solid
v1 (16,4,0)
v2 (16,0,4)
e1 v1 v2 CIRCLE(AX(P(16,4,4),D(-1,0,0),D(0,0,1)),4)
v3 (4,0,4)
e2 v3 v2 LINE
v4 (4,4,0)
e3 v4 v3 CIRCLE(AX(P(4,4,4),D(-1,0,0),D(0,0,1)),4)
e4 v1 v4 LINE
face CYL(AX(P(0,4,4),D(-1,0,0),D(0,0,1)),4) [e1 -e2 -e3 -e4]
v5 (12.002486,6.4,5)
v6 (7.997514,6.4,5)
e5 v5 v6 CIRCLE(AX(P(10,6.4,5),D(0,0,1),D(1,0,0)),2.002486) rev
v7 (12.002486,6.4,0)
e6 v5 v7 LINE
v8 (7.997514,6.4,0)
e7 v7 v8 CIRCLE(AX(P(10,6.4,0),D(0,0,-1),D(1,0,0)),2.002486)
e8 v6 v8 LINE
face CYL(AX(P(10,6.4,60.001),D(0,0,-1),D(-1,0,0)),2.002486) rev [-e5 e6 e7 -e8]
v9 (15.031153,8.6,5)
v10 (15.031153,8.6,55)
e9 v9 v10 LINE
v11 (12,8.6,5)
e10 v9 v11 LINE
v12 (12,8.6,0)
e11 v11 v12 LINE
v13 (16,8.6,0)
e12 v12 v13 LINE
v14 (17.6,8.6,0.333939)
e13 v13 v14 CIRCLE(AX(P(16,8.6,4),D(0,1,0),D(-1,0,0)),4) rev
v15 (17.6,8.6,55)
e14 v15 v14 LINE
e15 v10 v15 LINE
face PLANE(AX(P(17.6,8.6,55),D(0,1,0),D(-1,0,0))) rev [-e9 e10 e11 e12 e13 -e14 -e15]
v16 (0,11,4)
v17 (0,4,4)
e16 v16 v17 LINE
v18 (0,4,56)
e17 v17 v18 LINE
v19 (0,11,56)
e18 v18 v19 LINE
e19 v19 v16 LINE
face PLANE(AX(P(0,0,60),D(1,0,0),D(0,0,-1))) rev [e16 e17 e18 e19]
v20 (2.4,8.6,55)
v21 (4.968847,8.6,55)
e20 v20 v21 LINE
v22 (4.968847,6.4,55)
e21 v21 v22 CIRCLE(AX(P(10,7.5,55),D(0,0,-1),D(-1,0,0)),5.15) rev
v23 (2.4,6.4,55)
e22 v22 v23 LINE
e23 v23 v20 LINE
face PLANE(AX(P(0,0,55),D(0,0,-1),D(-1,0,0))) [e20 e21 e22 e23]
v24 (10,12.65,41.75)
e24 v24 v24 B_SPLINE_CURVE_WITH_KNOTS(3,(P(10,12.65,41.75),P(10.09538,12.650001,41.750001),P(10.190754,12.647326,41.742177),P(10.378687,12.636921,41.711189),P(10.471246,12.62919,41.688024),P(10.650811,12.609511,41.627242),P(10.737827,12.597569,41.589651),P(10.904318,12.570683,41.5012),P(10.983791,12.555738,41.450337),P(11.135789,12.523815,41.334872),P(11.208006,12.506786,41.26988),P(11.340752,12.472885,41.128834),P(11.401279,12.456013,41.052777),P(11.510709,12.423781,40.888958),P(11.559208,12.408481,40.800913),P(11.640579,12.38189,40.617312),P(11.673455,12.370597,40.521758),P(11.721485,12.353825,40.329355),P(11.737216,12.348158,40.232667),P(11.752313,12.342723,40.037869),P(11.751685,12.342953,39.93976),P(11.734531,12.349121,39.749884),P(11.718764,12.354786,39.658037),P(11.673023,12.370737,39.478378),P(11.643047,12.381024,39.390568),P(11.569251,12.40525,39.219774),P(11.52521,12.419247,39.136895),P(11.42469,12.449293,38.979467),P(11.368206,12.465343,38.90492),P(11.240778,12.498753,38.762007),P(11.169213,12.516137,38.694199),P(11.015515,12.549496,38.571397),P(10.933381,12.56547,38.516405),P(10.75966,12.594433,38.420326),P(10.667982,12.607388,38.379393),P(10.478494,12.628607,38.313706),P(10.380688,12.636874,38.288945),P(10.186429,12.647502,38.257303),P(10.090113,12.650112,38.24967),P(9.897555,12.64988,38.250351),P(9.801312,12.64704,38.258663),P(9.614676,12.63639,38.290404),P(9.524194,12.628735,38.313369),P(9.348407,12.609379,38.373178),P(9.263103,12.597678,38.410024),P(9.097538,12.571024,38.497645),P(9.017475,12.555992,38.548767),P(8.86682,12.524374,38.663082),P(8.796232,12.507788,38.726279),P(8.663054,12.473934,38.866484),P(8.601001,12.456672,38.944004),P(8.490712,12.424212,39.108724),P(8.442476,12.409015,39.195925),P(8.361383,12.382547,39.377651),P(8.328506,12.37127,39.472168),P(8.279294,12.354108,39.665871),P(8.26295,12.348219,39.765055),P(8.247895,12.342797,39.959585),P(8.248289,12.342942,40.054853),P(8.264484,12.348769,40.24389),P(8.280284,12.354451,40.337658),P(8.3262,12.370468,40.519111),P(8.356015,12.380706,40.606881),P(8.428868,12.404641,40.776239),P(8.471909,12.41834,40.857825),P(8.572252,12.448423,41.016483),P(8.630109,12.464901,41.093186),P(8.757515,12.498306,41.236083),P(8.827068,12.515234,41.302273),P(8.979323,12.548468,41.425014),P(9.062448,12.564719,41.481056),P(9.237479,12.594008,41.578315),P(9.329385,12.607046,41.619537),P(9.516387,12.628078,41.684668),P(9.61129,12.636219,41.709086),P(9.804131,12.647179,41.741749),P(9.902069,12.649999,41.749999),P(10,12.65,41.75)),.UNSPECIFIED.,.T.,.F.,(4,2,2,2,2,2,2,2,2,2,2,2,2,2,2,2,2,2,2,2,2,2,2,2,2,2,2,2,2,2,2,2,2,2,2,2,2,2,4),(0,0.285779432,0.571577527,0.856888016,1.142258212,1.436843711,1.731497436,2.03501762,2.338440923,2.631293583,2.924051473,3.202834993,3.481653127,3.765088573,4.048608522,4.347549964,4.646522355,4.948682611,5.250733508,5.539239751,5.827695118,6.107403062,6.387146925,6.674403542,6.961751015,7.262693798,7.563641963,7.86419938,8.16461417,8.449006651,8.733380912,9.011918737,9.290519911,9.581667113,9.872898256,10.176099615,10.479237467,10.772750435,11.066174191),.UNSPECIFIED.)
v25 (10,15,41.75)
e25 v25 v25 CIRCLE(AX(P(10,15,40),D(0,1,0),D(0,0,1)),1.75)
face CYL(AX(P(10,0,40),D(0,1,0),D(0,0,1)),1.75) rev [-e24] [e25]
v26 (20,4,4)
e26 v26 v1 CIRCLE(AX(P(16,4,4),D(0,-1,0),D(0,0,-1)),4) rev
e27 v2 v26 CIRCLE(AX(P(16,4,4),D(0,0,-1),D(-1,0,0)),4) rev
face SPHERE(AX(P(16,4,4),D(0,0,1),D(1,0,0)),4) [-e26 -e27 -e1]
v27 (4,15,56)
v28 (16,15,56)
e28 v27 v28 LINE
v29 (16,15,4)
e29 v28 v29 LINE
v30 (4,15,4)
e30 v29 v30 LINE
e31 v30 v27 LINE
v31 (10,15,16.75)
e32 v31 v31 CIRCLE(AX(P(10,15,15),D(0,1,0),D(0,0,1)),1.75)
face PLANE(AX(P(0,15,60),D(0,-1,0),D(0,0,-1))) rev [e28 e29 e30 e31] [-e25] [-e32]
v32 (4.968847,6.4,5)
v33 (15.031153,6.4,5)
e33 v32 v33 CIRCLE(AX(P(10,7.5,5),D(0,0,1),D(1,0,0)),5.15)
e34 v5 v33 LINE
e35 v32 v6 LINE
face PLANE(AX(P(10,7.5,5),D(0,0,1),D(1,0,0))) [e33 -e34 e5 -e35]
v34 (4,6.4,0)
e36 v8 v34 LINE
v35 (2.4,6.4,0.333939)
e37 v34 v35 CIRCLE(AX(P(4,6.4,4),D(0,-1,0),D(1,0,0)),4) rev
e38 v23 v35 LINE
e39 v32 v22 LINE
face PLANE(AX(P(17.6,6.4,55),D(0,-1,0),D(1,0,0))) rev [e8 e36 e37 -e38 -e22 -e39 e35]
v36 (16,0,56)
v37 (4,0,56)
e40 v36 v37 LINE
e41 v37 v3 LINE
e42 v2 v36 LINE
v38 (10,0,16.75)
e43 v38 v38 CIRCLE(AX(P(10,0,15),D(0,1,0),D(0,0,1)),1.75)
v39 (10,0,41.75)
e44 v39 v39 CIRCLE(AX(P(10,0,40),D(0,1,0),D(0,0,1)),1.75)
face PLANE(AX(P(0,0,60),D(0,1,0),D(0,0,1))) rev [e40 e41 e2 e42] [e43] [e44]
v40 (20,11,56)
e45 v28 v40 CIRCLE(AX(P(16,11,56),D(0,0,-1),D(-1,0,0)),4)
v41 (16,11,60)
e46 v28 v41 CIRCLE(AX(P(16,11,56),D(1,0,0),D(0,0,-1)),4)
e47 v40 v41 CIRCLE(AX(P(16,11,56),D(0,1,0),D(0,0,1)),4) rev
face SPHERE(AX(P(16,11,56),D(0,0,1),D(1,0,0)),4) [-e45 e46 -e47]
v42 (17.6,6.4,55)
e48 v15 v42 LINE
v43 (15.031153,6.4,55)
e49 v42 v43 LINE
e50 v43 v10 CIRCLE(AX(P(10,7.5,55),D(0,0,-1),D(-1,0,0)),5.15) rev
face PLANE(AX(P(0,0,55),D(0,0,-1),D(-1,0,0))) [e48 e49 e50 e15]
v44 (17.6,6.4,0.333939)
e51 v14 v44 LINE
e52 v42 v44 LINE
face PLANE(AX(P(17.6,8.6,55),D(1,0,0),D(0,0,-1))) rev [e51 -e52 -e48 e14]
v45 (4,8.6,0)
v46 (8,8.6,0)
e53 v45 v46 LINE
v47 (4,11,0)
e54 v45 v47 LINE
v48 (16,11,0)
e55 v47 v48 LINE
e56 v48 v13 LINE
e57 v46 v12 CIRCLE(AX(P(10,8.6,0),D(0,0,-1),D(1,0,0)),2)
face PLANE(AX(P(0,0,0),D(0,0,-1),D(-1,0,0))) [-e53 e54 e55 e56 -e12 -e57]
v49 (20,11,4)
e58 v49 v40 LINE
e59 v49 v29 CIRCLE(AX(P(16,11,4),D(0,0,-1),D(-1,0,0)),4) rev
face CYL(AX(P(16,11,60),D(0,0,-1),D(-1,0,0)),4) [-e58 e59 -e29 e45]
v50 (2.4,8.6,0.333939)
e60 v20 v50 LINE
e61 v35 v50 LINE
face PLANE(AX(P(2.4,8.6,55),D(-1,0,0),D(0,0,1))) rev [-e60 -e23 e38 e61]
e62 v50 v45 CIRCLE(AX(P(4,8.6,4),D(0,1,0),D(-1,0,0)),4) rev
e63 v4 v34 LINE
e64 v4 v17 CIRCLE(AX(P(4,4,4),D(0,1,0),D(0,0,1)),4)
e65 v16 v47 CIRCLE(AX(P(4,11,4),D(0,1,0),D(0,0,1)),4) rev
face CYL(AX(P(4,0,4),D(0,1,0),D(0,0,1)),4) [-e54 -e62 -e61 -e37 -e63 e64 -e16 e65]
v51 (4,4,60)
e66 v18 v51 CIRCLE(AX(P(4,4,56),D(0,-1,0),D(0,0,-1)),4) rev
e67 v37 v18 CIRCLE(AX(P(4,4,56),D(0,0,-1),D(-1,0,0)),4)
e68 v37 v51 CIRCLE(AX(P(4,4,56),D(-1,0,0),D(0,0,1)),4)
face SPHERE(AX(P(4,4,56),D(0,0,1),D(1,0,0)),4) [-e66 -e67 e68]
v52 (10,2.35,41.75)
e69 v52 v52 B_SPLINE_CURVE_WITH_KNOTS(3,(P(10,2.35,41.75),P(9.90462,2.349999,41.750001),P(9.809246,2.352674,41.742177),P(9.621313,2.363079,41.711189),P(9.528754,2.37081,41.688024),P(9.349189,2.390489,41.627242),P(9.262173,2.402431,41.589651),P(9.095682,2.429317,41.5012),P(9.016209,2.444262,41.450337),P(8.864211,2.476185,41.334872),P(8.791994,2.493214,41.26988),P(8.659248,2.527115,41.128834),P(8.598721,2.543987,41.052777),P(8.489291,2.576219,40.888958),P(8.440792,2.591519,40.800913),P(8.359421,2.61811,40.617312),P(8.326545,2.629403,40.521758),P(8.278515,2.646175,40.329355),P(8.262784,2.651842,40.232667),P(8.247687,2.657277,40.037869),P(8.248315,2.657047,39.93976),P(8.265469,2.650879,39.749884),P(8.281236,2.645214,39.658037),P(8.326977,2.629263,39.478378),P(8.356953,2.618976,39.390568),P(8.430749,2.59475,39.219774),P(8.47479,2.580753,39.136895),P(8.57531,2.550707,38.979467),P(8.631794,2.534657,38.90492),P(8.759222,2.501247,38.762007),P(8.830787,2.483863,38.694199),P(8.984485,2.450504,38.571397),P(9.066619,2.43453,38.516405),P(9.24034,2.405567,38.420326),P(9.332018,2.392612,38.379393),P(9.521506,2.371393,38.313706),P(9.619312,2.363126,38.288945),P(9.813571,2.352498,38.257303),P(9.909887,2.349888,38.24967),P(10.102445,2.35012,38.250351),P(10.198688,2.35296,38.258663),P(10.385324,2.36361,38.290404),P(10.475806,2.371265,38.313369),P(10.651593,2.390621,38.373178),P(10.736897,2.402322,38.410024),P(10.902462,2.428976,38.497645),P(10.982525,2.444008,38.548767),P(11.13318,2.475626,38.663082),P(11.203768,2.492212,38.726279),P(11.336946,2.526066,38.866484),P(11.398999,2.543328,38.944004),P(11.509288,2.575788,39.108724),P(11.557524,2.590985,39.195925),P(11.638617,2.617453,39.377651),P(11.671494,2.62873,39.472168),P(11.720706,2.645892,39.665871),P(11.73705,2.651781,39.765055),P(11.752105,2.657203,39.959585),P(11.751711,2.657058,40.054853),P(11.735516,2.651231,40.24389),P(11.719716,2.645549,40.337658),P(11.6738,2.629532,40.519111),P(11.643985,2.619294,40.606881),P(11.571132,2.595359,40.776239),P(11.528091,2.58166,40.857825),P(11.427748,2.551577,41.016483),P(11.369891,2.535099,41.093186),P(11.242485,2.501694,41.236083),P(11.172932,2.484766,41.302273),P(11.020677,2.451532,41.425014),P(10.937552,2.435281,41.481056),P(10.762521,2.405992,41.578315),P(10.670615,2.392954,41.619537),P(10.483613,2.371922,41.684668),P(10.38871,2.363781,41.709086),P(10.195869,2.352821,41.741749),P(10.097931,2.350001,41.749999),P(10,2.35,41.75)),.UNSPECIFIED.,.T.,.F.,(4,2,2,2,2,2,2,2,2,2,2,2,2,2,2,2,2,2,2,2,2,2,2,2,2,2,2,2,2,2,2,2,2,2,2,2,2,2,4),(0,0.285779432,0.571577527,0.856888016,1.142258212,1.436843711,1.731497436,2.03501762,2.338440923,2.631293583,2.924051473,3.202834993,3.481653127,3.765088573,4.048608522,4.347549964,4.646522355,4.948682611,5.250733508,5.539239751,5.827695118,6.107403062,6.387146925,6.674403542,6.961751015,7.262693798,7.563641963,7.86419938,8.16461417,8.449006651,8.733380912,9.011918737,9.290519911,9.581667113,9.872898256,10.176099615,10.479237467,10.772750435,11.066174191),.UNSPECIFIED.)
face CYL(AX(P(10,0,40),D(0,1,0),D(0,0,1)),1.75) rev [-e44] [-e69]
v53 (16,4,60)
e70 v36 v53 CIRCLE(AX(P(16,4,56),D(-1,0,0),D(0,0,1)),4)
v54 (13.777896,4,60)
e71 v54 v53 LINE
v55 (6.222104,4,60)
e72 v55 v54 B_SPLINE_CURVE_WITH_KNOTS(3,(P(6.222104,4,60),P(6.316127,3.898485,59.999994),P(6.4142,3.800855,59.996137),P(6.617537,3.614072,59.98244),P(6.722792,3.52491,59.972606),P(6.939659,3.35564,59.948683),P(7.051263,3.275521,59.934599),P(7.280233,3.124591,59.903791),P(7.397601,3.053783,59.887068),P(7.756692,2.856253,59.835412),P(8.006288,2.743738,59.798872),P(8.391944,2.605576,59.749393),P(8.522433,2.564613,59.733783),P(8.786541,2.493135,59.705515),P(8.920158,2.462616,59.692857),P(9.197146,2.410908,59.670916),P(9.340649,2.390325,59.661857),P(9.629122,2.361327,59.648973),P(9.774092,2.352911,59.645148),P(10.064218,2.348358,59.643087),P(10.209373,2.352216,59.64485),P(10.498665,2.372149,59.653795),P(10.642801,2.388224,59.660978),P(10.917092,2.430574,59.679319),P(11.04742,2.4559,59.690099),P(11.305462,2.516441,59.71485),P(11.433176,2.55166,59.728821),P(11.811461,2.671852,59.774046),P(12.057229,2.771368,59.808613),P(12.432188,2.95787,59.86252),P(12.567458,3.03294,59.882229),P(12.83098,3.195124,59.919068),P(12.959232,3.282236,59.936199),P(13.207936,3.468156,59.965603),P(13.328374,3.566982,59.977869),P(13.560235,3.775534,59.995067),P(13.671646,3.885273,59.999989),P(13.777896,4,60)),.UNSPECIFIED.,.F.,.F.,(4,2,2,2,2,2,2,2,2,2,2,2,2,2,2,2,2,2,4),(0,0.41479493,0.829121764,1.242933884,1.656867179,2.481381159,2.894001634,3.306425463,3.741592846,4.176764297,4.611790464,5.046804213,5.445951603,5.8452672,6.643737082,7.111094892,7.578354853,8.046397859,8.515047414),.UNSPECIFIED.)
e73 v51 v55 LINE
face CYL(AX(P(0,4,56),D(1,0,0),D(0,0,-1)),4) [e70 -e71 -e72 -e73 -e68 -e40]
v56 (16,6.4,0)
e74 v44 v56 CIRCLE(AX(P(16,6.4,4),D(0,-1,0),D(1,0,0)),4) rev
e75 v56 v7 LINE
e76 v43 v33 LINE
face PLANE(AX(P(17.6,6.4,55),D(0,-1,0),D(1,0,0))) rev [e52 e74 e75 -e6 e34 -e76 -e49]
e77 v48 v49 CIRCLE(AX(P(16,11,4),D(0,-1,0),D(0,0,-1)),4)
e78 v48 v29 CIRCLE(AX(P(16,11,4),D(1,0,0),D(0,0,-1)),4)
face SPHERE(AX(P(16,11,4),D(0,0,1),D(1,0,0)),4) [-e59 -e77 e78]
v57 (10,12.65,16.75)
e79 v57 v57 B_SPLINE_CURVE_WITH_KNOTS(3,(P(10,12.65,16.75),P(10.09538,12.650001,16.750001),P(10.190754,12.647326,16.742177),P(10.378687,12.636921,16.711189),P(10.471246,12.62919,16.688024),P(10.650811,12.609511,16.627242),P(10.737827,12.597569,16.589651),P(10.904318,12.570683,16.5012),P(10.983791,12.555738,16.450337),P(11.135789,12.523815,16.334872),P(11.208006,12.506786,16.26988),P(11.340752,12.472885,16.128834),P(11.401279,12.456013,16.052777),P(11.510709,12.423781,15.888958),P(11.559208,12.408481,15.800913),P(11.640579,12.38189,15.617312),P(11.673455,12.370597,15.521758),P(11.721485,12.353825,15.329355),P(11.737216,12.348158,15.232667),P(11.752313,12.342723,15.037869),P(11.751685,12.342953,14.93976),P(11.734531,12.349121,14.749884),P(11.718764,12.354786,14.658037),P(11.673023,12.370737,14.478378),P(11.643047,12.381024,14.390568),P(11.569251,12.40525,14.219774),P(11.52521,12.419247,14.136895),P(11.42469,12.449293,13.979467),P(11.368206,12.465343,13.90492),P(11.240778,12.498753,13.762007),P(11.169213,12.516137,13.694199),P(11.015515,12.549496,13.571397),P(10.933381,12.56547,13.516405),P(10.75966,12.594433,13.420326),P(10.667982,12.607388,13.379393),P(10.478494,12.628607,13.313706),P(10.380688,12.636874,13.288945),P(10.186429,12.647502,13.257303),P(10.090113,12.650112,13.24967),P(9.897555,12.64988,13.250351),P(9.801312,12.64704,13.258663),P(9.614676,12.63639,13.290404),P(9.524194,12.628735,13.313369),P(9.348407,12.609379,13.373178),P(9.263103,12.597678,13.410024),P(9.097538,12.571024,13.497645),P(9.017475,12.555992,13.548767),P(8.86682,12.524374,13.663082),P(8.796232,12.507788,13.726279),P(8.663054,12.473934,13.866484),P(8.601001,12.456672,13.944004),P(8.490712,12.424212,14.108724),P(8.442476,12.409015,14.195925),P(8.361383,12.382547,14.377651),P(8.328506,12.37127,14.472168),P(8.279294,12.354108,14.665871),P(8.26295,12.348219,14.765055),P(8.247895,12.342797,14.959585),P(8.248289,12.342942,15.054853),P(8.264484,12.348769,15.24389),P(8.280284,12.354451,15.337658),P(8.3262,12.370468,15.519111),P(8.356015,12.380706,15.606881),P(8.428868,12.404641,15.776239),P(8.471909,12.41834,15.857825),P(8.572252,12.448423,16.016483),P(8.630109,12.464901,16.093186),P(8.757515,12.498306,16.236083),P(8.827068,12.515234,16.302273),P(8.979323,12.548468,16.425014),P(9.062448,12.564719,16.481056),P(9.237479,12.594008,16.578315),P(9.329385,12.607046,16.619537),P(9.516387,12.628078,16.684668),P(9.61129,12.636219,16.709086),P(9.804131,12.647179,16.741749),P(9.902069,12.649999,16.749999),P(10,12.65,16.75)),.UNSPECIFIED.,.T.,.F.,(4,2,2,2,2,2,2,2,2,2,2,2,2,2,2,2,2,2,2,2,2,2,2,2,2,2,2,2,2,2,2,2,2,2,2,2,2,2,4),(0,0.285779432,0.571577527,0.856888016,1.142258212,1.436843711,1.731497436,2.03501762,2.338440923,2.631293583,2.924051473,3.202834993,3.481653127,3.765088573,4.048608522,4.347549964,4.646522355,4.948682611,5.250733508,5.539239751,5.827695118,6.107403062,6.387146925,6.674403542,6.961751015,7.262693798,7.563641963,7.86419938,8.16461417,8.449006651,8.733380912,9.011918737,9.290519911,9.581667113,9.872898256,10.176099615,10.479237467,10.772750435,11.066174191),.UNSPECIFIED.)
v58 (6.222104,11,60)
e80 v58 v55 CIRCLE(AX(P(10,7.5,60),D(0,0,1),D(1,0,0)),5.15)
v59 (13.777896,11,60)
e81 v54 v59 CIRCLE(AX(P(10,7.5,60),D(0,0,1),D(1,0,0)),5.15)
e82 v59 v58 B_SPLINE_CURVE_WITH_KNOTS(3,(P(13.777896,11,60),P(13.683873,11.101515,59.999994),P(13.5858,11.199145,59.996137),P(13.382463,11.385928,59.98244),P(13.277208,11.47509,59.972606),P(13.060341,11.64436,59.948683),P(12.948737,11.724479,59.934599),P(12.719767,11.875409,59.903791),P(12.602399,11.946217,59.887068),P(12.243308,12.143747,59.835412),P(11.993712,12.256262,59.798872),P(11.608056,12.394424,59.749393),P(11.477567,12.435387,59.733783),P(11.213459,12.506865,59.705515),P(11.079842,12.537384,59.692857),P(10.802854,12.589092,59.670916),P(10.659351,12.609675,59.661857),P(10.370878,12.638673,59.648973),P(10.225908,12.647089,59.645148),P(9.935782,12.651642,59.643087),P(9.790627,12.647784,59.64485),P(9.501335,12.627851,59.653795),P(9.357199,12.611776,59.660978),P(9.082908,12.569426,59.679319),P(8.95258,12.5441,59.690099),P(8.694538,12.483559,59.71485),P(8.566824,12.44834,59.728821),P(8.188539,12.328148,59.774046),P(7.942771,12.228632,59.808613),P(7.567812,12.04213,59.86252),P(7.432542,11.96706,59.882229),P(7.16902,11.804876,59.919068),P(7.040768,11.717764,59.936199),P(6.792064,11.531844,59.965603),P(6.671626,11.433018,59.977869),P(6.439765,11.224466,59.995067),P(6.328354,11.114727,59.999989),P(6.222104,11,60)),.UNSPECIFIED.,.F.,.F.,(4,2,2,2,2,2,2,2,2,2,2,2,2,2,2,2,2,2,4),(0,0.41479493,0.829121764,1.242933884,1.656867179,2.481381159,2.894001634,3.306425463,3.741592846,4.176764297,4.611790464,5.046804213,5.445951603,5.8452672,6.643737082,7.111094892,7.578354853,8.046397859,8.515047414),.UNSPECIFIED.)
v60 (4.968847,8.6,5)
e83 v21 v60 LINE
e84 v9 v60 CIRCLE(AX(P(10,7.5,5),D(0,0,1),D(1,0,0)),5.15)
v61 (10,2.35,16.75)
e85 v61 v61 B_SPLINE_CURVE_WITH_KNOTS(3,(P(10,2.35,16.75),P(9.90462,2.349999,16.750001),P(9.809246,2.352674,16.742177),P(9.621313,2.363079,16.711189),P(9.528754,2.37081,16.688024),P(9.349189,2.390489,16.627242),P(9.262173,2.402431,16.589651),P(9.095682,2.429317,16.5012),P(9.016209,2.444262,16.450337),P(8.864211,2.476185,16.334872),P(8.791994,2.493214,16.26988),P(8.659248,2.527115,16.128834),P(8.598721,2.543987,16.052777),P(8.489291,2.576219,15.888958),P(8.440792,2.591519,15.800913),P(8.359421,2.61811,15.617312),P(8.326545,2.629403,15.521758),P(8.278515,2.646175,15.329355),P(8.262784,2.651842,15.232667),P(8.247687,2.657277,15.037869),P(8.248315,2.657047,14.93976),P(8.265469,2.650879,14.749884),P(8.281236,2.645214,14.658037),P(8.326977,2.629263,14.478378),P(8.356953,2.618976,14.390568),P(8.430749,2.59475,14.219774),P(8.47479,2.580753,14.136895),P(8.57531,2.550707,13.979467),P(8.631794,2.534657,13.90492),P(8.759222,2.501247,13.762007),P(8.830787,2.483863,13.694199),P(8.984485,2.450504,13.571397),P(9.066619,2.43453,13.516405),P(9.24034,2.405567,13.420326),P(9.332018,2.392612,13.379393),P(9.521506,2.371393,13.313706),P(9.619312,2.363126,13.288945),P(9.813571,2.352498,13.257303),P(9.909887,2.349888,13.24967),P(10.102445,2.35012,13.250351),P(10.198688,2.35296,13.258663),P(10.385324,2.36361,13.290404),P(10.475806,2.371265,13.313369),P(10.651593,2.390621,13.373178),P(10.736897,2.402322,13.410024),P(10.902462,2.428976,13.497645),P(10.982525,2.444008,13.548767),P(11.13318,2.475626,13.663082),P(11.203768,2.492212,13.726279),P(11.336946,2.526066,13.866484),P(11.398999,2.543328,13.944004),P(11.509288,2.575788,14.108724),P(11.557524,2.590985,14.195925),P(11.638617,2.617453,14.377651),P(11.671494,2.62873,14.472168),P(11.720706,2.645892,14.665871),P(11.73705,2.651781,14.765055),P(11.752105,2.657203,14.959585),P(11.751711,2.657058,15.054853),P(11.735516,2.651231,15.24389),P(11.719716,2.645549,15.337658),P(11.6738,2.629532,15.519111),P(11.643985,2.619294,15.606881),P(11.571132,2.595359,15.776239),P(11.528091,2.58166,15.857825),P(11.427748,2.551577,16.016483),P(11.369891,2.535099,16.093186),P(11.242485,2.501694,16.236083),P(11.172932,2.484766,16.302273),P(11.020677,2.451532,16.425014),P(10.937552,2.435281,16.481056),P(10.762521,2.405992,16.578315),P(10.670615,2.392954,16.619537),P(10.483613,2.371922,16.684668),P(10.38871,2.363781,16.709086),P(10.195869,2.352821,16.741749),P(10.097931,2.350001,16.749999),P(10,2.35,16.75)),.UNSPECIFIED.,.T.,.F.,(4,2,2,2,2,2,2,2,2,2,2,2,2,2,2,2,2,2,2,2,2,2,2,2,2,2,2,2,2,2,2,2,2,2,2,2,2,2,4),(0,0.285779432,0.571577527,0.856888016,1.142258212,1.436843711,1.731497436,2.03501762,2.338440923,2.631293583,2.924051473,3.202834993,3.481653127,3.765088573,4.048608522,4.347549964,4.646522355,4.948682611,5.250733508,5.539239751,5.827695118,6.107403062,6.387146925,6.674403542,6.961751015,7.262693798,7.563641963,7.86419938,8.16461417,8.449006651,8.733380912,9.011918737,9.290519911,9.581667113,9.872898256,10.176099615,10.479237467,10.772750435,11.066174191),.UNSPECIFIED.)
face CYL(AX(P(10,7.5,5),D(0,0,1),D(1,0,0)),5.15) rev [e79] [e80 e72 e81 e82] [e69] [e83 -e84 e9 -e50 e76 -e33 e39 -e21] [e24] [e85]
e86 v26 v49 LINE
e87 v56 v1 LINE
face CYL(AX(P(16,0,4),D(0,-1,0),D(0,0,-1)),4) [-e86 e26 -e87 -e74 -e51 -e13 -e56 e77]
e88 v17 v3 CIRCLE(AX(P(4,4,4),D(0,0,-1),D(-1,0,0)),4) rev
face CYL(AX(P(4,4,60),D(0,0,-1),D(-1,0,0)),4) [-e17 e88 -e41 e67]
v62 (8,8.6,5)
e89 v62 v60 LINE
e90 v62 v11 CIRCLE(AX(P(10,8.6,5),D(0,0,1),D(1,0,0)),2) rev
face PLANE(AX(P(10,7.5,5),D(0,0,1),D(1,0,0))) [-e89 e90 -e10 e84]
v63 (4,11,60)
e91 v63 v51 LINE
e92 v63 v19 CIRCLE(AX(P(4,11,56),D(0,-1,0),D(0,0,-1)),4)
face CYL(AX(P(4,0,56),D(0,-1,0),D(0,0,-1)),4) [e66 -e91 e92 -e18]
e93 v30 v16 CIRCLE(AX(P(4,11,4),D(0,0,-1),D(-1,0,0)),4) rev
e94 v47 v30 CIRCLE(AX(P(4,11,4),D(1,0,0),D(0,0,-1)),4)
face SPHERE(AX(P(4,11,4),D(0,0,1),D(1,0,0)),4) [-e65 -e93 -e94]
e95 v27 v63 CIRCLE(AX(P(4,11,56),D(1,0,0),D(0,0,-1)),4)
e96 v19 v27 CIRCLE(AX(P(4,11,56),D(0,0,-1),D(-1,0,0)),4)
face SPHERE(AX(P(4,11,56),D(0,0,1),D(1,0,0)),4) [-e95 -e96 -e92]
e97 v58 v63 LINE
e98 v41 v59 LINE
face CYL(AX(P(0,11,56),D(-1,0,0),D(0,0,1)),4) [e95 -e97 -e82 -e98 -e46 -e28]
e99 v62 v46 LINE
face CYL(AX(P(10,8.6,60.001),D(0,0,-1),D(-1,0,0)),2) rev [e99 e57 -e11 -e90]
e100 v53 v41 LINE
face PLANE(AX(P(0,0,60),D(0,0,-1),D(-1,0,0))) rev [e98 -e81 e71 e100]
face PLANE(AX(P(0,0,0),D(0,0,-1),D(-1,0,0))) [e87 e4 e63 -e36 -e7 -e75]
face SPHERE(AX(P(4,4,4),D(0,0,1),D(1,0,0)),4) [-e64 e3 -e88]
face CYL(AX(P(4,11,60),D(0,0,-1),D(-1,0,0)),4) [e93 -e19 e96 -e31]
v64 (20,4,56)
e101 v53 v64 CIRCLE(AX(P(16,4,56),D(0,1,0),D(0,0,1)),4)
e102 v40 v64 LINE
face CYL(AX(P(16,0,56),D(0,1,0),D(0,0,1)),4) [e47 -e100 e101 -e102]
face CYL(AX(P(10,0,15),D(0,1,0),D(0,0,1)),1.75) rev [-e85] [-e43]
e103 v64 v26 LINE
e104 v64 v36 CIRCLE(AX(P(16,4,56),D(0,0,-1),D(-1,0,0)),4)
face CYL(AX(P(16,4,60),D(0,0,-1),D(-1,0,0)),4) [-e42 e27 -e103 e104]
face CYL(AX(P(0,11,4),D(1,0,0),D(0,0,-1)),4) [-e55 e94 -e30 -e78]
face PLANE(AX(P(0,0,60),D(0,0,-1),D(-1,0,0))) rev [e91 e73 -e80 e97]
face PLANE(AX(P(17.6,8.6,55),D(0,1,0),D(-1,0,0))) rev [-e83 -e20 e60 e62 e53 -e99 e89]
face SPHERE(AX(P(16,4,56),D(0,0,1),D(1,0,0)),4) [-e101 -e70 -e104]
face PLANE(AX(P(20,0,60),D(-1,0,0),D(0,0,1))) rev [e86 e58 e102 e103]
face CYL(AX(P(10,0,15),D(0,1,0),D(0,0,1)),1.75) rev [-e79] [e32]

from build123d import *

# Parameters (mm, degrees)
SKETCH1_W           = 20
SKETCH1_H           = 15
BOSS_EXTRUDE1_DEPTH = 60
SKETCH2_R           = 5.15
CUT_EXTRUDE1_DEPTH  = 55
SKETCH3_W           = 15.2
SKETCH3_H           = 2.2
CUT_EXTRUDE2_DEPTH  = 55
SKETCH4_R           = 1.75
CUT_EXTRUDE3_DEPTH  = 66
FILLET1_R           = 4
FILLET3_R           = 4
CUT_EXTRUDE4_REACH  = 67


with BuildPart() as part:
    # Sketch1 → Boss-Extrude1 (new body)
    with BuildSketch(Plane.XY):
        with Locations((10, 7.5)):
            Rectangle(SKETCH1_W, SKETCH1_H)
    extrude(amount=BOSS_EXTRUDE1_DEPTH)

    # Sketch2 → Cut-Extrude1 (cut)
    with BuildSketch(Plane.XY.offset(60)):
        with Locations((10, 7.5)):
            Circle(SKETCH2_R)
    extrude(amount=-CUT_EXTRUDE1_DEPTH, mode=Mode.SUBTRACT)

    # Sketch3 → Cut-Extrude2 (cut)
    with BuildSketch(Plane(origin=(0, 0, 0), x_dir=(-1, 0, 0), z_dir=(0, 0, -1))):
        with Locations((-10, 7.5)):
            Rectangle(SKETCH3_W, SKETCH3_H)
    extrude(amount=-CUT_EXTRUDE2_DEPTH, mode=Mode.SUBTRACT)

    # Sketch4 → Cut-Extrude3 (cut, through all)
    with BuildSketch(Plane(origin=(0, 15, 0), x_dir=(1, 0, 0), z_dir=(0, 1, 0))):
        with Locations(Location((10, -15, 0), (0, 0, 270))):
            Circle(SKETCH4_R)
        with Locations(Location((10, -40, 0), (0, 0, 270))):
            Circle(SKETCH4_R)
    extrude(amount=-CUT_EXTRUDE3_DEPTH, mode=Mode.SUBTRACT)

    # Fillet1
    # the kernel refuses this fillet: 4 mm, written as the material it takes off along each edge
    with BuildSketch(Plane(origin=(0, 15, -10), x_dir=(0, -1, 0), z_dir=(0, 0, 1)), Plane(origin=(0, 0, -10), x_dir=(1, 0, 0), z_dir=(0, 0, 1))) as fillet1_piece_1:
        with BuildLine():
            CenterArc((FILLET1_R, FILLET1_R), FILLET1_R, 180, 90)
            Line((0, FILLET1_R), (0, 0))
            Line((0, 0), (FILLET1_R, 0))
        make_face()
    extrude(amount=80, mode=Mode.SUBTRACT)
    with BuildSketch(Plane(origin=(0, 25, 60), x_dir=(0, 0, -1), z_dir=(0, -1, 0)), Plane(origin=(20, -10, 0), x_dir=(-1, 0, 0), z_dir=(0, 1, 0))) as fillet1_piece_2:
        with BuildLine():
            CenterArc((FILLET1_R, FILLET1_R), FILLET1_R, 180, 90)
            Line((0, FILLET1_R), (0, 0))
            Line((0, 0), (FILLET1_R, 0))
        make_face()
    extrude(amount=35, mode=Mode.SUBTRACT)
    with BuildSketch(Plane(origin=(0, 25, 0), x_dir=(0, 0, 1), z_dir=(0, -1, 0)), Plane(origin=(20, -10, 60), x_dir=(-1, 0, 0), z_dir=(0, 1, 0))) as fillet1_piece_3:
        with BuildLine():
            CenterArc((FILLET1_R, -FILLET1_R), FILLET1_R, 90, 90)
            Line((0, -FILLET1_R), (0, 0))
            Line((0, 0), (FILLET1_R, 0))
        make_face()
    extrude(amount=35, mode=Mode.SUBTRACT)
    with BuildSketch(Plane(origin=(20, 0, -10), x_dir=(-1, 0, 0), z_dir=(0, 0, 1)), Plane(origin=(20, 15, -10), x_dir=(0, -1, 0), z_dir=(0, 0, 1))) as fillet1_piece_4:
        with BuildLine():
            CenterArc((FILLET1_R, -FILLET1_R), FILLET1_R, 90, 90)
            Line((0, -FILLET1_R), (0, 0))
            Line((0, 0), (FILLET1_R, 0))
        make_face()
    extrude(amount=80, mode=Mode.SUBTRACT)

    # Fillet3
    # the kernel refuses this fillet: 4 mm, written as the material it takes off along each edge
    with BuildSketch(Plane(origin=(4, 4, 56), x_dir=(0, 0, 1), z_dir=(0, -1, 0))) as fillet3_piece_1_section:
        Polygon((0, 0), (FILLET3_R, 0), (FILLET3_R, FILLET3_R), (0, FILLET3_R), align=None)
    fillet3_piece_1 = extrude(amount=FILLET3_R, mode=Mode.PRIVATE)
    fillet3_piece_1 = fillet3_piece_1 - Plane(origin=(4, 4, 56), x_dir=(0.7071067811865475, 0, -0.7071067811865475), z_dir=(0, -1, 0)) * Sphere(FILLET3_R, mode=Mode.PRIVATE)
    add(fillet3_piece_1, mode=Mode.SUBTRACT)
    with BuildSketch(Plane(origin=(4, 4, 4), x_dir=(0, 0, -1), z_dir=(0, -1, 0))) as fillet3_piece_2_section:
        Polygon((0, 0), (FILLET3_R, 0), (FILLET3_R, -FILLET3_R), (0, -FILLET3_R), align=None)
    fillet3_piece_2 = extrude(amount=FILLET3_R, mode=Mode.PRIVATE)
    fillet3_piece_2 = fillet3_piece_2 - Plane(origin=(4, 4, 4), x_dir=(0.7071067811865475, 0, 0.7071067811865475), z_dir=(0, -1, 0)) * Sphere(FILLET3_R, mode=Mode.PRIVATE)
    add(fillet3_piece_2, mode=Mode.SUBTRACT)
    with BuildSketch(Plane(origin=(4, 11, 56), x_dir=(0, 1, 0), z_dir=(0, 0, 1))) as fillet3_piece_3_section:
        Polygon((0, 0), (FILLET3_R, 0), (FILLET3_R, FILLET3_R), (0, FILLET3_R), align=None)
    fillet3_piece_3 = extrude(amount=FILLET3_R, mode=Mode.PRIVATE)
    fillet3_piece_3 = fillet3_piece_3 - Plane(origin=(4, 11, 56), x_dir=(0.7071067811865475, -0.7071067811865475, 0), z_dir=(0, 0, 1)) * Sphere(FILLET3_R, mode=Mode.PRIVATE)
    add(fillet3_piece_3, mode=Mode.SUBTRACT)
    with BuildSketch(Plane(origin=(4, 11, 4), x_dir=(0, 0, -1), z_dir=(0, 1, 0))) as fillet3_piece_4_section:
        Polygon((0, 0), (FILLET3_R, 0), (FILLET3_R, FILLET3_R), (0, FILLET3_R), align=None)
    fillet3_piece_4 = extrude(amount=FILLET3_R, mode=Mode.PRIVATE)
    fillet3_piece_4 = fillet3_piece_4 - Plane(origin=(4, 11, 4), x_dir=(0.7071067811865475, 0, 0.7071067811865475), z_dir=(0, 1, 0)) * Sphere(FILLET3_R, mode=Mode.PRIVATE)
    add(fillet3_piece_4, mode=Mode.SUBTRACT)
    with BuildSketch(Plane(origin=(16, 11, 56), x_dir=(0, 1, 0), z_dir=(0, 0, 1))) as fillet3_piece_5_section:
        Polygon((0, 0), (FILLET3_R, 0), (FILLET3_R, -FILLET3_R), (0, -FILLET3_R), align=None)
    fillet3_piece_5 = extrude(amount=FILLET3_R, mode=Mode.PRIVATE)
    fillet3_piece_5 = fillet3_piece_5 - Plane(origin=(16, 11, 56), x_dir=(-0.7071067811865475, -0.7071067811865475, 0), z_dir=(0, 0, 1)) * Sphere(FILLET3_R, mode=Mode.PRIVATE)
    add(fillet3_piece_5, mode=Mode.SUBTRACT)
    with BuildSketch(Plane(origin=(16, 11, 4), x_dir=(0, 0, -1), z_dir=(0, 1, 0))) as fillet3_piece_6_section:
        Polygon((0, 0), (FILLET3_R, 0), (FILLET3_R, -FILLET3_R), (0, -FILLET3_R), align=None)
    fillet3_piece_6 = extrude(amount=FILLET3_R, mode=Mode.PRIVATE)
    fillet3_piece_6 = fillet3_piece_6 - Plane(origin=(16, 11, 4), x_dir=(-0.7071067811865475, 0, 0.7071067811865475), z_dir=(0, 1, 0)) * Sphere(FILLET3_R, mode=Mode.PRIVATE)
    add(fillet3_piece_6, mode=Mode.SUBTRACT)
    with BuildSketch(Plane(origin=(16, 4, 56), x_dir=(0, 0, 1), z_dir=(0, -1, 0))) as fillet3_piece_7_section:
        Polygon((0, 0), (FILLET3_R, 0), (FILLET3_R, -FILLET3_R), (0, -FILLET3_R), align=None)
    fillet3_piece_7 = extrude(amount=FILLET3_R, mode=Mode.PRIVATE)
    fillet3_piece_7 = fillet3_piece_7 - Plane(origin=(16, 4, 56), x_dir=(-0.7071067811865475, 0, -0.7071067811865475), z_dir=(0, -1, 0)) * Sphere(FILLET3_R, mode=Mode.PRIVATE)
    add(fillet3_piece_7, mode=Mode.SUBTRACT)
    with BuildSketch(Plane(origin=(16, 4, 4), x_dir=(0, 0, -1), z_dir=(0, -1, 0))) as fillet3_piece_8_section:
        Polygon((0, 0), (FILLET3_R, 0), (FILLET3_R, FILLET3_R), (0, FILLET3_R), align=None)
    fillet3_piece_8 = extrude(amount=FILLET3_R, mode=Mode.PRIVATE)
    fillet3_piece_8 = fillet3_piece_8 - Plane(origin=(16, 4, 4), x_dir=(-0.7071067811865475, 0, 0.7071067811865475), z_dir=(0, -1, 0)) * Sphere(FILLET3_R, mode=Mode.PRIVATE)
    add(fillet3_piece_8, mode=Mode.SUBTRACT)
    with BuildSketch(Plane(origin=(16, 15, 0), x_dir=(0, 0, 1), z_dir=(-1, 0, 0)), Plane(origin=(16, 15, 60), x_dir=(0, -1, 0), z_dir=(-1, 0, 0)), Plane(origin=(4, 0, 0), x_dir=(0, 0, 1), z_dir=(1, 0, 0))) as fillet3_piece_9:
        with BuildLine():
            CenterArc((FILLET3_R, -FILLET3_R), FILLET3_R, 90, 90)
            Line((0, -FILLET3_R), (0, 0))
            Line((0, 0), (FILLET3_R, 0))
        make_face()
    extrude(amount=12, mode=Mode.SUBTRACT)
    with BuildSketch(Plane(origin=(4, 0, 60), x_dir=(0, 0, -1), z_dir=(1, 0, 0))) as fillet3_piece_10:
        with BuildLine():
            CenterArc((FILLET3_R, FILLET3_R), FILLET3_R, 180, 90)
            Line((0, FILLET3_R), (0, 0))
            Line((0, 0), (FILLET3_R, 0))
        make_face()
    extrude(amount=12, mode=Mode.SUBTRACT)

    # Sketch5 → Cut-Extrude4 (cut, up to next)
    with BuildSketch(Plane(origin=(0, 0, 0), x_dir=(-1, 0, 0), z_dir=(0, 0, -1)), mode=Mode.PRIVATE) as cut_extrude4_sk1:
        with BuildLine():
            Line((-12, 8.6), (-8, 8.6))
            ThreePointArc((-8, 8.6), (-10, 10.6), (-12, 8.6))
        make_face()
    cut_extrude4_tool1 = extrude(cut_extrude4_sk1.sketch, amount=-CUT_EXTRUDE4_REACH, mode=Mode.PRIVATE) & part.part
    # Sketch5 → Cut-Extrude4 (cut, up to next)
    with BuildSketch(Plane(origin=(0, 0, 0), x_dir=(-1, 0, 0), z_dir=(0, 0, -1)), mode=Mode.PRIVATE) as cut_extrude4_sk2:
        with BuildLine():
            Line((-12.002485504, 6.4), (-7.997514496, 6.4))
            ThreePointArc((-7.997514496, 6.4), (-10, 4.397514496), (-12.002485504, 6.4))
        make_face()
    cut_extrude4_tool2 = extrude(cut_extrude4_sk2.sketch, amount=-CUT_EXTRUDE4_REACH, mode=Mode.PRIVATE) & part.part
    add(cut_extrude4_tool1.solids().sort_by_distance((10, 9.448826, 0))[0], mode=Mode.SUBTRACT)
    add(cut_extrude4_tool2.solids().sort_by_distance((10, 5.550119, 0))[0], mode=Mode.SUBTRACT)


solid = part.part
